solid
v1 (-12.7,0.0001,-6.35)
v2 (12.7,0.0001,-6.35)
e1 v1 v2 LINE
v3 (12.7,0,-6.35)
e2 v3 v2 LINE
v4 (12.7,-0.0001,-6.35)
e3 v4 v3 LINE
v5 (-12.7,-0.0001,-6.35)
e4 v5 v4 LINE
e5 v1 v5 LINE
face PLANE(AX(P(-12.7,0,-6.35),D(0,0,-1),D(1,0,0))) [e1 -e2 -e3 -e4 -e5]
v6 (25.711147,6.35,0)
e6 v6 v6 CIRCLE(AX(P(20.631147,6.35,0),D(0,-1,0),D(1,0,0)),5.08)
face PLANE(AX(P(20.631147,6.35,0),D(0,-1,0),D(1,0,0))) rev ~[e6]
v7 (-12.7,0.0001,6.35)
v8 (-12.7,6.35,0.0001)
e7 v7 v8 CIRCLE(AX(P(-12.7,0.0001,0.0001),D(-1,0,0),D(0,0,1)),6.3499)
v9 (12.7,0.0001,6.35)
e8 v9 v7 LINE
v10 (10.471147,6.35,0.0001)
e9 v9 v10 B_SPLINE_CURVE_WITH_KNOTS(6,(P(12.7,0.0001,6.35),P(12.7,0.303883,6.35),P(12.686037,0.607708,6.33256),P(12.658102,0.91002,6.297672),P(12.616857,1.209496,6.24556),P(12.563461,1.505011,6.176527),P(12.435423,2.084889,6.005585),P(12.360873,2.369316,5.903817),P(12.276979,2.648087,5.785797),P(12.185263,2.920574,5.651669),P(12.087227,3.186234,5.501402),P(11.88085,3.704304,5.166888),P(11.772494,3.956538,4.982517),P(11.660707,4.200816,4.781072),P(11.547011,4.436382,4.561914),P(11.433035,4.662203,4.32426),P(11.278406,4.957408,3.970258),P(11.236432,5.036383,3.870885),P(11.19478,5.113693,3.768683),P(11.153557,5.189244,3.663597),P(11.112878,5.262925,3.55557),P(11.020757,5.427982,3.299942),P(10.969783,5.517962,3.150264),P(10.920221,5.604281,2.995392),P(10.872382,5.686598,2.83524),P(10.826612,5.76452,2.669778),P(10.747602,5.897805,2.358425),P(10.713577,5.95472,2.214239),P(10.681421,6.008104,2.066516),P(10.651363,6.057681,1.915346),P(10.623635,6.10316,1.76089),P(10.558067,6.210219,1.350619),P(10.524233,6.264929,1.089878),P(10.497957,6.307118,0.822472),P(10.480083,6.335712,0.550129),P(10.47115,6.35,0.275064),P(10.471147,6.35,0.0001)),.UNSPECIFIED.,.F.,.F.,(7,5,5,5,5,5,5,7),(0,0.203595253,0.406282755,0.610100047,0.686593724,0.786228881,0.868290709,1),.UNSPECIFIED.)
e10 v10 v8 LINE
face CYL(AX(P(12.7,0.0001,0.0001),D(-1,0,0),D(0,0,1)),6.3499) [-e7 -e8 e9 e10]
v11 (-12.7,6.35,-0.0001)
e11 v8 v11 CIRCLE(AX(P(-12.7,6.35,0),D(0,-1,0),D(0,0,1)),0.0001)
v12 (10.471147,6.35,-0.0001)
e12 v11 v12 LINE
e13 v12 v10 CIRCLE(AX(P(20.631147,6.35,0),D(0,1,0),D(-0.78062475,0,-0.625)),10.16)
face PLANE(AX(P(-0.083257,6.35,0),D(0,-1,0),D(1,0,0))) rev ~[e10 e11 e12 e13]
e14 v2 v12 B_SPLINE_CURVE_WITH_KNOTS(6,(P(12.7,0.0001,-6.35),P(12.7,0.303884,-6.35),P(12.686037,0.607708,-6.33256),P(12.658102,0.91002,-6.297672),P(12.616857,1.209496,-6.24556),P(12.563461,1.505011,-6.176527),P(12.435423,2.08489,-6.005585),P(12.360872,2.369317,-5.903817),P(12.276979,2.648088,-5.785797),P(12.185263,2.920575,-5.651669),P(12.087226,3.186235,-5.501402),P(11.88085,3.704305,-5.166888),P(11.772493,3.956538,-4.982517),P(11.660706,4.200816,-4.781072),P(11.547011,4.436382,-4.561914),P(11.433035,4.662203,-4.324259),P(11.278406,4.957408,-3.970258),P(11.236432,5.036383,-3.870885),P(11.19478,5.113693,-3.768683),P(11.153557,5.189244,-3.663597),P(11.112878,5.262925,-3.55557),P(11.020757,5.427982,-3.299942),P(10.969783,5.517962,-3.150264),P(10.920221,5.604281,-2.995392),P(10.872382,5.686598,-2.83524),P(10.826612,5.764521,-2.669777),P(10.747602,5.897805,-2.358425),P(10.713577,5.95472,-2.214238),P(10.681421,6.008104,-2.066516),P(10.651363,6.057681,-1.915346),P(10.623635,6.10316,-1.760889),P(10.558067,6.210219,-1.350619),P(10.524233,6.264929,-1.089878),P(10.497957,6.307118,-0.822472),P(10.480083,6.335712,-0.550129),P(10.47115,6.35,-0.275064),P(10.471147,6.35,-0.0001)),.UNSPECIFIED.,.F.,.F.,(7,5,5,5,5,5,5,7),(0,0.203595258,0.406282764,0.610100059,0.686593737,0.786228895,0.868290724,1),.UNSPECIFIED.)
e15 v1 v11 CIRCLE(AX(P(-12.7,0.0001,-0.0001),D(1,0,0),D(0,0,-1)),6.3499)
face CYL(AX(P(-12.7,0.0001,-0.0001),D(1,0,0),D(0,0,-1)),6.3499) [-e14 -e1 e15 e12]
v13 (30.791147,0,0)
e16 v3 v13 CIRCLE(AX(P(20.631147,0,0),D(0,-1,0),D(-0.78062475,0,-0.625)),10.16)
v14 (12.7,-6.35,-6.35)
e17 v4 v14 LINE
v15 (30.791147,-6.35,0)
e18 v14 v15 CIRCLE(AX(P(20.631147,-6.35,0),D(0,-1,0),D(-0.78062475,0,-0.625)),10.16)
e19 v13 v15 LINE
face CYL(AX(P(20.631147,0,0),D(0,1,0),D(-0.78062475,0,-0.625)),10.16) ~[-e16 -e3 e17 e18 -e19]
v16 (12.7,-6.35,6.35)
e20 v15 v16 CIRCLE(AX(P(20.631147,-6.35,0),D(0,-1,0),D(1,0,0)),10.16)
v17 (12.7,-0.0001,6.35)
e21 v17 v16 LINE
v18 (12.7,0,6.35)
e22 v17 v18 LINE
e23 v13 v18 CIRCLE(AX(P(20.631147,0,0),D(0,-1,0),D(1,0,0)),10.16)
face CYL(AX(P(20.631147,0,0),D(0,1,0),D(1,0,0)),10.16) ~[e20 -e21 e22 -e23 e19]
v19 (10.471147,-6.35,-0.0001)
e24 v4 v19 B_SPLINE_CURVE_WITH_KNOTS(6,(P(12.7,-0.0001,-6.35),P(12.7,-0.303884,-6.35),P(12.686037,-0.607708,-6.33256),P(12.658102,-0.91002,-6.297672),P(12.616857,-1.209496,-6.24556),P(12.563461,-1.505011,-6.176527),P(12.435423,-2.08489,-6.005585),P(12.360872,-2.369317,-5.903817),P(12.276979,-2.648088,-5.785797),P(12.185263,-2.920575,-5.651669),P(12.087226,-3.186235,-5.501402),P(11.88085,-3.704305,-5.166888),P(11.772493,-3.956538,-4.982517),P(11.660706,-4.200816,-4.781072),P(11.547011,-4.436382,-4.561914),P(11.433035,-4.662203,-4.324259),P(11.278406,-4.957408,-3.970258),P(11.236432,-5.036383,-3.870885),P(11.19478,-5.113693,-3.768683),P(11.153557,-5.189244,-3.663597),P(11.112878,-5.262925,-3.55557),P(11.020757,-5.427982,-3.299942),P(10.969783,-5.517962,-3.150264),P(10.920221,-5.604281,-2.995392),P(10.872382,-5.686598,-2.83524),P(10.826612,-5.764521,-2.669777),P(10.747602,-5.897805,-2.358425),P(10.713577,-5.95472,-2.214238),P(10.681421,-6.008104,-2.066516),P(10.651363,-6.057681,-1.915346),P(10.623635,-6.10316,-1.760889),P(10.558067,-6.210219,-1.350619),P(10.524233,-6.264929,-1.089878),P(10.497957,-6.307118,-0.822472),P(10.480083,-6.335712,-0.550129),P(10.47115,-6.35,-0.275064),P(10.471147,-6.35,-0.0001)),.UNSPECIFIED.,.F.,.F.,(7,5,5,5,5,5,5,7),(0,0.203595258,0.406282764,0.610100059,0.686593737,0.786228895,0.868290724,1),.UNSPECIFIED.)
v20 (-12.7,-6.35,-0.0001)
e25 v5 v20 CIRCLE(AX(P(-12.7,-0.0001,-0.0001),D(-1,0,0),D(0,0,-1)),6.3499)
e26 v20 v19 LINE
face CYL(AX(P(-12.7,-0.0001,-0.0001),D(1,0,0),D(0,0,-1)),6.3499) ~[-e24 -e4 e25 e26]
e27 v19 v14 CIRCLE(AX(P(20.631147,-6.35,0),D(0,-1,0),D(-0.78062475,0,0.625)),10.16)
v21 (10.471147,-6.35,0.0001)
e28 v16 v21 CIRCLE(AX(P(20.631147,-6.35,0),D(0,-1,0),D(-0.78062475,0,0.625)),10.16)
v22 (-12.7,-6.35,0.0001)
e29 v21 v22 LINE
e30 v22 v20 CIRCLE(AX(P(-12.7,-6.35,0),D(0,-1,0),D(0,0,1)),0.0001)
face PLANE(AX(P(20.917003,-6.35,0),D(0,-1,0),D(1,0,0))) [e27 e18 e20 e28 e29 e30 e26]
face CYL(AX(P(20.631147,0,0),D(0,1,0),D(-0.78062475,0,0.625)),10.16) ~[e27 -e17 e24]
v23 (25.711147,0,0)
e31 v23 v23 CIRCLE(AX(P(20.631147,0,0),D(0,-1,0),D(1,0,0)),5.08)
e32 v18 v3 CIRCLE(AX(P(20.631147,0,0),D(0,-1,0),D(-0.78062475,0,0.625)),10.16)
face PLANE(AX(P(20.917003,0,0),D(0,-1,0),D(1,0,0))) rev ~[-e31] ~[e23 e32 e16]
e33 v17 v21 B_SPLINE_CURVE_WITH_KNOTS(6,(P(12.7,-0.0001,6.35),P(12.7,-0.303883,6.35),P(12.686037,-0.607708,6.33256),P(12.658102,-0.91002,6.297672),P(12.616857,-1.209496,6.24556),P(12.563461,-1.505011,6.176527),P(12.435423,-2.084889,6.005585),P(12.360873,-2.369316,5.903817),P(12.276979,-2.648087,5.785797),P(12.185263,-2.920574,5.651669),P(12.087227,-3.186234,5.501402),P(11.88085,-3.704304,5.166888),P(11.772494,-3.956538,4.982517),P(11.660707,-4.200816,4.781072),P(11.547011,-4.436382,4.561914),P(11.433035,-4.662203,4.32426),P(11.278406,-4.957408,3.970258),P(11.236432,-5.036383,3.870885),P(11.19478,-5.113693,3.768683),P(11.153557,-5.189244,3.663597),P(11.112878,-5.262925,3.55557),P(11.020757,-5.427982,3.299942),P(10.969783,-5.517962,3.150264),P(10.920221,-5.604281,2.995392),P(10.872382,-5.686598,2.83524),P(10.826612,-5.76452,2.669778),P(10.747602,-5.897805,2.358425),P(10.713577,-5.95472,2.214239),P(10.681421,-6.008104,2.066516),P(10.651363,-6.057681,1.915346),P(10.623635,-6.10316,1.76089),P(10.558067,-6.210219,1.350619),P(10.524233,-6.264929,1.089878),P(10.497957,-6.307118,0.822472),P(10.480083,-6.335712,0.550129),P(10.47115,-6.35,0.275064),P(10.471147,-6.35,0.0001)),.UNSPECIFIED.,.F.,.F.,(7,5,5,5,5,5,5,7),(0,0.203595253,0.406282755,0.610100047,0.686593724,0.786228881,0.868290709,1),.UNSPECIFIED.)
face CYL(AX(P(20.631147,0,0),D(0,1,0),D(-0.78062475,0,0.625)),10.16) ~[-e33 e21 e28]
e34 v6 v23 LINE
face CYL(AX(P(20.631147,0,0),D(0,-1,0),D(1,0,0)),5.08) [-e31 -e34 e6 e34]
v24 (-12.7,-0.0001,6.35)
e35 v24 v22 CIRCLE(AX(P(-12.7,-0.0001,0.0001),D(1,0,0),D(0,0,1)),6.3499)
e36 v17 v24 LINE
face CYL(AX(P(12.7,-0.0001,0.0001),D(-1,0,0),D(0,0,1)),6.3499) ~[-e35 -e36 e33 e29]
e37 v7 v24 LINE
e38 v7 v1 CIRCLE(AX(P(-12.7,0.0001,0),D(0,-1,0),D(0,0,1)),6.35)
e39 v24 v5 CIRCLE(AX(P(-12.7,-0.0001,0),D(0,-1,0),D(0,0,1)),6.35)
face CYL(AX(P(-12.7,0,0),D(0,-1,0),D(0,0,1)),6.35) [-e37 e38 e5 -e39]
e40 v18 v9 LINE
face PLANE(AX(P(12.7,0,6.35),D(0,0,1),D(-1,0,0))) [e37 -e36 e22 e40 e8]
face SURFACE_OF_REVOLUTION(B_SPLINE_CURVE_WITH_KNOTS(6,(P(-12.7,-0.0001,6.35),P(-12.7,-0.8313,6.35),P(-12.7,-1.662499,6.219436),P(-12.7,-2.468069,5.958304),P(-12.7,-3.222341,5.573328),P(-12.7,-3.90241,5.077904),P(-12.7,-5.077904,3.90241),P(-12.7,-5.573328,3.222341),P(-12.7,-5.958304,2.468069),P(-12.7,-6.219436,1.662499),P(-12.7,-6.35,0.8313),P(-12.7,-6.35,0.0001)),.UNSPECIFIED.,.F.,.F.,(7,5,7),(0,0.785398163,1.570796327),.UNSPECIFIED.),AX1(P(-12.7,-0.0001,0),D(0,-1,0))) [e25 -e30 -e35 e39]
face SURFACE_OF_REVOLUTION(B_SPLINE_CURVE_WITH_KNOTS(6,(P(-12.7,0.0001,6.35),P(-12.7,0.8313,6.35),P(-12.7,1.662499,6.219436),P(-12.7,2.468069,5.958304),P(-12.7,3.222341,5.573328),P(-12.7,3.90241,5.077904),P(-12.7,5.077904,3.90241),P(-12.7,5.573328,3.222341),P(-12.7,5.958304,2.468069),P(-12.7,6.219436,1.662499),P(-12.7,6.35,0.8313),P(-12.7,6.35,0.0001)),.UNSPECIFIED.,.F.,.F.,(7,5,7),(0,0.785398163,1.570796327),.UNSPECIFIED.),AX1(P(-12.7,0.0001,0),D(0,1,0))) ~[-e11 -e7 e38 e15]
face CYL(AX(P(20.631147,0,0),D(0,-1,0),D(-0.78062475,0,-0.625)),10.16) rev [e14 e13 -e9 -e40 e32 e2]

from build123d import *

# Parameters (mm, degrees)
F1_DEPTH = 6.35
F2_R     = 6.3499
F0_R     = 5.08
F3_DEPTH = 6.35
F4_DEPTH = 6.35


# Not quite as in the source:
# - a fillet or chamfer is up to 0.001 mm smaller than in the source, because OpenCascade refuses the exact size


with BuildPart() as f1:
    # F0 (on Front) → F1 (new body, symmetric)
    with BuildSketch(Plane.XZ):
        with BuildLine():
            Line((12.7, 6.35), (-12.7, 6.35))
            Line((-12.7, 6.35), (-12.7, -6.35))
            Line((-12.7, -6.35), (12.7, -6.35))
            ThreePointArc((12.7, -6.35), (10.471147458, 0), (12.7, 6.35))
        make_face()
        with BuildLine():
            Line((-12.7, -6.35), (-12.7, 6.35))
            ThreePointArc((-12.7, 6.35), (-19.05, 0), (-12.7, -6.35))
        make_face()
    extrude(amount=F1_DEPTH, both=True)

    # F2 (radius 6.35 in the source; OpenCascade refuses exactly that, so slightly less here)
    f2_edges = [f1.edges().sort_by_distance(p)[0] for p in [
        (0, -6.35, 6.35),
        (0, 6.35, 6.35),
        (0, -6.35, -6.35),
        (0, 6.35, -6.35),
    ]]
    fillet(f2_edges, radius=F2_R)

    # F0 (on Front) → F3 (join)
    with BuildSketch(Plane.XZ):
        with BuildLine():
            ThreePointArc((30.791147458, 0), (23.9960502669, 9.5866067556), (12.7, 6.35))
            Line((12.7, 6.35), (12.7, -6.35))
            ThreePointArc((12.7, -6.35), (23.9960502669, -9.5866067556), (30.791147458, 0))
        make_face()
        with Locations((20.631147458, 0)):
            Circle(F0_R, mode=Mode.SUBTRACT)
        with BuildLine():
            Line((12.7, -6.35), (12.7, 6.35))
            ThreePointArc((12.7, 6.35), (10.471147458, 0), (12.7, -6.35))
        make_face()
    extrude(amount=F3_DEPTH)

    # F0 (on Front) → F4 (join, symmetric)
    with BuildSketch(Plane.XZ):
        with Locations((20.631147458, 0)):
            Circle(F0_R)
    extrude(amount=F4_DEPTH, both=True)


solid = f1.part
